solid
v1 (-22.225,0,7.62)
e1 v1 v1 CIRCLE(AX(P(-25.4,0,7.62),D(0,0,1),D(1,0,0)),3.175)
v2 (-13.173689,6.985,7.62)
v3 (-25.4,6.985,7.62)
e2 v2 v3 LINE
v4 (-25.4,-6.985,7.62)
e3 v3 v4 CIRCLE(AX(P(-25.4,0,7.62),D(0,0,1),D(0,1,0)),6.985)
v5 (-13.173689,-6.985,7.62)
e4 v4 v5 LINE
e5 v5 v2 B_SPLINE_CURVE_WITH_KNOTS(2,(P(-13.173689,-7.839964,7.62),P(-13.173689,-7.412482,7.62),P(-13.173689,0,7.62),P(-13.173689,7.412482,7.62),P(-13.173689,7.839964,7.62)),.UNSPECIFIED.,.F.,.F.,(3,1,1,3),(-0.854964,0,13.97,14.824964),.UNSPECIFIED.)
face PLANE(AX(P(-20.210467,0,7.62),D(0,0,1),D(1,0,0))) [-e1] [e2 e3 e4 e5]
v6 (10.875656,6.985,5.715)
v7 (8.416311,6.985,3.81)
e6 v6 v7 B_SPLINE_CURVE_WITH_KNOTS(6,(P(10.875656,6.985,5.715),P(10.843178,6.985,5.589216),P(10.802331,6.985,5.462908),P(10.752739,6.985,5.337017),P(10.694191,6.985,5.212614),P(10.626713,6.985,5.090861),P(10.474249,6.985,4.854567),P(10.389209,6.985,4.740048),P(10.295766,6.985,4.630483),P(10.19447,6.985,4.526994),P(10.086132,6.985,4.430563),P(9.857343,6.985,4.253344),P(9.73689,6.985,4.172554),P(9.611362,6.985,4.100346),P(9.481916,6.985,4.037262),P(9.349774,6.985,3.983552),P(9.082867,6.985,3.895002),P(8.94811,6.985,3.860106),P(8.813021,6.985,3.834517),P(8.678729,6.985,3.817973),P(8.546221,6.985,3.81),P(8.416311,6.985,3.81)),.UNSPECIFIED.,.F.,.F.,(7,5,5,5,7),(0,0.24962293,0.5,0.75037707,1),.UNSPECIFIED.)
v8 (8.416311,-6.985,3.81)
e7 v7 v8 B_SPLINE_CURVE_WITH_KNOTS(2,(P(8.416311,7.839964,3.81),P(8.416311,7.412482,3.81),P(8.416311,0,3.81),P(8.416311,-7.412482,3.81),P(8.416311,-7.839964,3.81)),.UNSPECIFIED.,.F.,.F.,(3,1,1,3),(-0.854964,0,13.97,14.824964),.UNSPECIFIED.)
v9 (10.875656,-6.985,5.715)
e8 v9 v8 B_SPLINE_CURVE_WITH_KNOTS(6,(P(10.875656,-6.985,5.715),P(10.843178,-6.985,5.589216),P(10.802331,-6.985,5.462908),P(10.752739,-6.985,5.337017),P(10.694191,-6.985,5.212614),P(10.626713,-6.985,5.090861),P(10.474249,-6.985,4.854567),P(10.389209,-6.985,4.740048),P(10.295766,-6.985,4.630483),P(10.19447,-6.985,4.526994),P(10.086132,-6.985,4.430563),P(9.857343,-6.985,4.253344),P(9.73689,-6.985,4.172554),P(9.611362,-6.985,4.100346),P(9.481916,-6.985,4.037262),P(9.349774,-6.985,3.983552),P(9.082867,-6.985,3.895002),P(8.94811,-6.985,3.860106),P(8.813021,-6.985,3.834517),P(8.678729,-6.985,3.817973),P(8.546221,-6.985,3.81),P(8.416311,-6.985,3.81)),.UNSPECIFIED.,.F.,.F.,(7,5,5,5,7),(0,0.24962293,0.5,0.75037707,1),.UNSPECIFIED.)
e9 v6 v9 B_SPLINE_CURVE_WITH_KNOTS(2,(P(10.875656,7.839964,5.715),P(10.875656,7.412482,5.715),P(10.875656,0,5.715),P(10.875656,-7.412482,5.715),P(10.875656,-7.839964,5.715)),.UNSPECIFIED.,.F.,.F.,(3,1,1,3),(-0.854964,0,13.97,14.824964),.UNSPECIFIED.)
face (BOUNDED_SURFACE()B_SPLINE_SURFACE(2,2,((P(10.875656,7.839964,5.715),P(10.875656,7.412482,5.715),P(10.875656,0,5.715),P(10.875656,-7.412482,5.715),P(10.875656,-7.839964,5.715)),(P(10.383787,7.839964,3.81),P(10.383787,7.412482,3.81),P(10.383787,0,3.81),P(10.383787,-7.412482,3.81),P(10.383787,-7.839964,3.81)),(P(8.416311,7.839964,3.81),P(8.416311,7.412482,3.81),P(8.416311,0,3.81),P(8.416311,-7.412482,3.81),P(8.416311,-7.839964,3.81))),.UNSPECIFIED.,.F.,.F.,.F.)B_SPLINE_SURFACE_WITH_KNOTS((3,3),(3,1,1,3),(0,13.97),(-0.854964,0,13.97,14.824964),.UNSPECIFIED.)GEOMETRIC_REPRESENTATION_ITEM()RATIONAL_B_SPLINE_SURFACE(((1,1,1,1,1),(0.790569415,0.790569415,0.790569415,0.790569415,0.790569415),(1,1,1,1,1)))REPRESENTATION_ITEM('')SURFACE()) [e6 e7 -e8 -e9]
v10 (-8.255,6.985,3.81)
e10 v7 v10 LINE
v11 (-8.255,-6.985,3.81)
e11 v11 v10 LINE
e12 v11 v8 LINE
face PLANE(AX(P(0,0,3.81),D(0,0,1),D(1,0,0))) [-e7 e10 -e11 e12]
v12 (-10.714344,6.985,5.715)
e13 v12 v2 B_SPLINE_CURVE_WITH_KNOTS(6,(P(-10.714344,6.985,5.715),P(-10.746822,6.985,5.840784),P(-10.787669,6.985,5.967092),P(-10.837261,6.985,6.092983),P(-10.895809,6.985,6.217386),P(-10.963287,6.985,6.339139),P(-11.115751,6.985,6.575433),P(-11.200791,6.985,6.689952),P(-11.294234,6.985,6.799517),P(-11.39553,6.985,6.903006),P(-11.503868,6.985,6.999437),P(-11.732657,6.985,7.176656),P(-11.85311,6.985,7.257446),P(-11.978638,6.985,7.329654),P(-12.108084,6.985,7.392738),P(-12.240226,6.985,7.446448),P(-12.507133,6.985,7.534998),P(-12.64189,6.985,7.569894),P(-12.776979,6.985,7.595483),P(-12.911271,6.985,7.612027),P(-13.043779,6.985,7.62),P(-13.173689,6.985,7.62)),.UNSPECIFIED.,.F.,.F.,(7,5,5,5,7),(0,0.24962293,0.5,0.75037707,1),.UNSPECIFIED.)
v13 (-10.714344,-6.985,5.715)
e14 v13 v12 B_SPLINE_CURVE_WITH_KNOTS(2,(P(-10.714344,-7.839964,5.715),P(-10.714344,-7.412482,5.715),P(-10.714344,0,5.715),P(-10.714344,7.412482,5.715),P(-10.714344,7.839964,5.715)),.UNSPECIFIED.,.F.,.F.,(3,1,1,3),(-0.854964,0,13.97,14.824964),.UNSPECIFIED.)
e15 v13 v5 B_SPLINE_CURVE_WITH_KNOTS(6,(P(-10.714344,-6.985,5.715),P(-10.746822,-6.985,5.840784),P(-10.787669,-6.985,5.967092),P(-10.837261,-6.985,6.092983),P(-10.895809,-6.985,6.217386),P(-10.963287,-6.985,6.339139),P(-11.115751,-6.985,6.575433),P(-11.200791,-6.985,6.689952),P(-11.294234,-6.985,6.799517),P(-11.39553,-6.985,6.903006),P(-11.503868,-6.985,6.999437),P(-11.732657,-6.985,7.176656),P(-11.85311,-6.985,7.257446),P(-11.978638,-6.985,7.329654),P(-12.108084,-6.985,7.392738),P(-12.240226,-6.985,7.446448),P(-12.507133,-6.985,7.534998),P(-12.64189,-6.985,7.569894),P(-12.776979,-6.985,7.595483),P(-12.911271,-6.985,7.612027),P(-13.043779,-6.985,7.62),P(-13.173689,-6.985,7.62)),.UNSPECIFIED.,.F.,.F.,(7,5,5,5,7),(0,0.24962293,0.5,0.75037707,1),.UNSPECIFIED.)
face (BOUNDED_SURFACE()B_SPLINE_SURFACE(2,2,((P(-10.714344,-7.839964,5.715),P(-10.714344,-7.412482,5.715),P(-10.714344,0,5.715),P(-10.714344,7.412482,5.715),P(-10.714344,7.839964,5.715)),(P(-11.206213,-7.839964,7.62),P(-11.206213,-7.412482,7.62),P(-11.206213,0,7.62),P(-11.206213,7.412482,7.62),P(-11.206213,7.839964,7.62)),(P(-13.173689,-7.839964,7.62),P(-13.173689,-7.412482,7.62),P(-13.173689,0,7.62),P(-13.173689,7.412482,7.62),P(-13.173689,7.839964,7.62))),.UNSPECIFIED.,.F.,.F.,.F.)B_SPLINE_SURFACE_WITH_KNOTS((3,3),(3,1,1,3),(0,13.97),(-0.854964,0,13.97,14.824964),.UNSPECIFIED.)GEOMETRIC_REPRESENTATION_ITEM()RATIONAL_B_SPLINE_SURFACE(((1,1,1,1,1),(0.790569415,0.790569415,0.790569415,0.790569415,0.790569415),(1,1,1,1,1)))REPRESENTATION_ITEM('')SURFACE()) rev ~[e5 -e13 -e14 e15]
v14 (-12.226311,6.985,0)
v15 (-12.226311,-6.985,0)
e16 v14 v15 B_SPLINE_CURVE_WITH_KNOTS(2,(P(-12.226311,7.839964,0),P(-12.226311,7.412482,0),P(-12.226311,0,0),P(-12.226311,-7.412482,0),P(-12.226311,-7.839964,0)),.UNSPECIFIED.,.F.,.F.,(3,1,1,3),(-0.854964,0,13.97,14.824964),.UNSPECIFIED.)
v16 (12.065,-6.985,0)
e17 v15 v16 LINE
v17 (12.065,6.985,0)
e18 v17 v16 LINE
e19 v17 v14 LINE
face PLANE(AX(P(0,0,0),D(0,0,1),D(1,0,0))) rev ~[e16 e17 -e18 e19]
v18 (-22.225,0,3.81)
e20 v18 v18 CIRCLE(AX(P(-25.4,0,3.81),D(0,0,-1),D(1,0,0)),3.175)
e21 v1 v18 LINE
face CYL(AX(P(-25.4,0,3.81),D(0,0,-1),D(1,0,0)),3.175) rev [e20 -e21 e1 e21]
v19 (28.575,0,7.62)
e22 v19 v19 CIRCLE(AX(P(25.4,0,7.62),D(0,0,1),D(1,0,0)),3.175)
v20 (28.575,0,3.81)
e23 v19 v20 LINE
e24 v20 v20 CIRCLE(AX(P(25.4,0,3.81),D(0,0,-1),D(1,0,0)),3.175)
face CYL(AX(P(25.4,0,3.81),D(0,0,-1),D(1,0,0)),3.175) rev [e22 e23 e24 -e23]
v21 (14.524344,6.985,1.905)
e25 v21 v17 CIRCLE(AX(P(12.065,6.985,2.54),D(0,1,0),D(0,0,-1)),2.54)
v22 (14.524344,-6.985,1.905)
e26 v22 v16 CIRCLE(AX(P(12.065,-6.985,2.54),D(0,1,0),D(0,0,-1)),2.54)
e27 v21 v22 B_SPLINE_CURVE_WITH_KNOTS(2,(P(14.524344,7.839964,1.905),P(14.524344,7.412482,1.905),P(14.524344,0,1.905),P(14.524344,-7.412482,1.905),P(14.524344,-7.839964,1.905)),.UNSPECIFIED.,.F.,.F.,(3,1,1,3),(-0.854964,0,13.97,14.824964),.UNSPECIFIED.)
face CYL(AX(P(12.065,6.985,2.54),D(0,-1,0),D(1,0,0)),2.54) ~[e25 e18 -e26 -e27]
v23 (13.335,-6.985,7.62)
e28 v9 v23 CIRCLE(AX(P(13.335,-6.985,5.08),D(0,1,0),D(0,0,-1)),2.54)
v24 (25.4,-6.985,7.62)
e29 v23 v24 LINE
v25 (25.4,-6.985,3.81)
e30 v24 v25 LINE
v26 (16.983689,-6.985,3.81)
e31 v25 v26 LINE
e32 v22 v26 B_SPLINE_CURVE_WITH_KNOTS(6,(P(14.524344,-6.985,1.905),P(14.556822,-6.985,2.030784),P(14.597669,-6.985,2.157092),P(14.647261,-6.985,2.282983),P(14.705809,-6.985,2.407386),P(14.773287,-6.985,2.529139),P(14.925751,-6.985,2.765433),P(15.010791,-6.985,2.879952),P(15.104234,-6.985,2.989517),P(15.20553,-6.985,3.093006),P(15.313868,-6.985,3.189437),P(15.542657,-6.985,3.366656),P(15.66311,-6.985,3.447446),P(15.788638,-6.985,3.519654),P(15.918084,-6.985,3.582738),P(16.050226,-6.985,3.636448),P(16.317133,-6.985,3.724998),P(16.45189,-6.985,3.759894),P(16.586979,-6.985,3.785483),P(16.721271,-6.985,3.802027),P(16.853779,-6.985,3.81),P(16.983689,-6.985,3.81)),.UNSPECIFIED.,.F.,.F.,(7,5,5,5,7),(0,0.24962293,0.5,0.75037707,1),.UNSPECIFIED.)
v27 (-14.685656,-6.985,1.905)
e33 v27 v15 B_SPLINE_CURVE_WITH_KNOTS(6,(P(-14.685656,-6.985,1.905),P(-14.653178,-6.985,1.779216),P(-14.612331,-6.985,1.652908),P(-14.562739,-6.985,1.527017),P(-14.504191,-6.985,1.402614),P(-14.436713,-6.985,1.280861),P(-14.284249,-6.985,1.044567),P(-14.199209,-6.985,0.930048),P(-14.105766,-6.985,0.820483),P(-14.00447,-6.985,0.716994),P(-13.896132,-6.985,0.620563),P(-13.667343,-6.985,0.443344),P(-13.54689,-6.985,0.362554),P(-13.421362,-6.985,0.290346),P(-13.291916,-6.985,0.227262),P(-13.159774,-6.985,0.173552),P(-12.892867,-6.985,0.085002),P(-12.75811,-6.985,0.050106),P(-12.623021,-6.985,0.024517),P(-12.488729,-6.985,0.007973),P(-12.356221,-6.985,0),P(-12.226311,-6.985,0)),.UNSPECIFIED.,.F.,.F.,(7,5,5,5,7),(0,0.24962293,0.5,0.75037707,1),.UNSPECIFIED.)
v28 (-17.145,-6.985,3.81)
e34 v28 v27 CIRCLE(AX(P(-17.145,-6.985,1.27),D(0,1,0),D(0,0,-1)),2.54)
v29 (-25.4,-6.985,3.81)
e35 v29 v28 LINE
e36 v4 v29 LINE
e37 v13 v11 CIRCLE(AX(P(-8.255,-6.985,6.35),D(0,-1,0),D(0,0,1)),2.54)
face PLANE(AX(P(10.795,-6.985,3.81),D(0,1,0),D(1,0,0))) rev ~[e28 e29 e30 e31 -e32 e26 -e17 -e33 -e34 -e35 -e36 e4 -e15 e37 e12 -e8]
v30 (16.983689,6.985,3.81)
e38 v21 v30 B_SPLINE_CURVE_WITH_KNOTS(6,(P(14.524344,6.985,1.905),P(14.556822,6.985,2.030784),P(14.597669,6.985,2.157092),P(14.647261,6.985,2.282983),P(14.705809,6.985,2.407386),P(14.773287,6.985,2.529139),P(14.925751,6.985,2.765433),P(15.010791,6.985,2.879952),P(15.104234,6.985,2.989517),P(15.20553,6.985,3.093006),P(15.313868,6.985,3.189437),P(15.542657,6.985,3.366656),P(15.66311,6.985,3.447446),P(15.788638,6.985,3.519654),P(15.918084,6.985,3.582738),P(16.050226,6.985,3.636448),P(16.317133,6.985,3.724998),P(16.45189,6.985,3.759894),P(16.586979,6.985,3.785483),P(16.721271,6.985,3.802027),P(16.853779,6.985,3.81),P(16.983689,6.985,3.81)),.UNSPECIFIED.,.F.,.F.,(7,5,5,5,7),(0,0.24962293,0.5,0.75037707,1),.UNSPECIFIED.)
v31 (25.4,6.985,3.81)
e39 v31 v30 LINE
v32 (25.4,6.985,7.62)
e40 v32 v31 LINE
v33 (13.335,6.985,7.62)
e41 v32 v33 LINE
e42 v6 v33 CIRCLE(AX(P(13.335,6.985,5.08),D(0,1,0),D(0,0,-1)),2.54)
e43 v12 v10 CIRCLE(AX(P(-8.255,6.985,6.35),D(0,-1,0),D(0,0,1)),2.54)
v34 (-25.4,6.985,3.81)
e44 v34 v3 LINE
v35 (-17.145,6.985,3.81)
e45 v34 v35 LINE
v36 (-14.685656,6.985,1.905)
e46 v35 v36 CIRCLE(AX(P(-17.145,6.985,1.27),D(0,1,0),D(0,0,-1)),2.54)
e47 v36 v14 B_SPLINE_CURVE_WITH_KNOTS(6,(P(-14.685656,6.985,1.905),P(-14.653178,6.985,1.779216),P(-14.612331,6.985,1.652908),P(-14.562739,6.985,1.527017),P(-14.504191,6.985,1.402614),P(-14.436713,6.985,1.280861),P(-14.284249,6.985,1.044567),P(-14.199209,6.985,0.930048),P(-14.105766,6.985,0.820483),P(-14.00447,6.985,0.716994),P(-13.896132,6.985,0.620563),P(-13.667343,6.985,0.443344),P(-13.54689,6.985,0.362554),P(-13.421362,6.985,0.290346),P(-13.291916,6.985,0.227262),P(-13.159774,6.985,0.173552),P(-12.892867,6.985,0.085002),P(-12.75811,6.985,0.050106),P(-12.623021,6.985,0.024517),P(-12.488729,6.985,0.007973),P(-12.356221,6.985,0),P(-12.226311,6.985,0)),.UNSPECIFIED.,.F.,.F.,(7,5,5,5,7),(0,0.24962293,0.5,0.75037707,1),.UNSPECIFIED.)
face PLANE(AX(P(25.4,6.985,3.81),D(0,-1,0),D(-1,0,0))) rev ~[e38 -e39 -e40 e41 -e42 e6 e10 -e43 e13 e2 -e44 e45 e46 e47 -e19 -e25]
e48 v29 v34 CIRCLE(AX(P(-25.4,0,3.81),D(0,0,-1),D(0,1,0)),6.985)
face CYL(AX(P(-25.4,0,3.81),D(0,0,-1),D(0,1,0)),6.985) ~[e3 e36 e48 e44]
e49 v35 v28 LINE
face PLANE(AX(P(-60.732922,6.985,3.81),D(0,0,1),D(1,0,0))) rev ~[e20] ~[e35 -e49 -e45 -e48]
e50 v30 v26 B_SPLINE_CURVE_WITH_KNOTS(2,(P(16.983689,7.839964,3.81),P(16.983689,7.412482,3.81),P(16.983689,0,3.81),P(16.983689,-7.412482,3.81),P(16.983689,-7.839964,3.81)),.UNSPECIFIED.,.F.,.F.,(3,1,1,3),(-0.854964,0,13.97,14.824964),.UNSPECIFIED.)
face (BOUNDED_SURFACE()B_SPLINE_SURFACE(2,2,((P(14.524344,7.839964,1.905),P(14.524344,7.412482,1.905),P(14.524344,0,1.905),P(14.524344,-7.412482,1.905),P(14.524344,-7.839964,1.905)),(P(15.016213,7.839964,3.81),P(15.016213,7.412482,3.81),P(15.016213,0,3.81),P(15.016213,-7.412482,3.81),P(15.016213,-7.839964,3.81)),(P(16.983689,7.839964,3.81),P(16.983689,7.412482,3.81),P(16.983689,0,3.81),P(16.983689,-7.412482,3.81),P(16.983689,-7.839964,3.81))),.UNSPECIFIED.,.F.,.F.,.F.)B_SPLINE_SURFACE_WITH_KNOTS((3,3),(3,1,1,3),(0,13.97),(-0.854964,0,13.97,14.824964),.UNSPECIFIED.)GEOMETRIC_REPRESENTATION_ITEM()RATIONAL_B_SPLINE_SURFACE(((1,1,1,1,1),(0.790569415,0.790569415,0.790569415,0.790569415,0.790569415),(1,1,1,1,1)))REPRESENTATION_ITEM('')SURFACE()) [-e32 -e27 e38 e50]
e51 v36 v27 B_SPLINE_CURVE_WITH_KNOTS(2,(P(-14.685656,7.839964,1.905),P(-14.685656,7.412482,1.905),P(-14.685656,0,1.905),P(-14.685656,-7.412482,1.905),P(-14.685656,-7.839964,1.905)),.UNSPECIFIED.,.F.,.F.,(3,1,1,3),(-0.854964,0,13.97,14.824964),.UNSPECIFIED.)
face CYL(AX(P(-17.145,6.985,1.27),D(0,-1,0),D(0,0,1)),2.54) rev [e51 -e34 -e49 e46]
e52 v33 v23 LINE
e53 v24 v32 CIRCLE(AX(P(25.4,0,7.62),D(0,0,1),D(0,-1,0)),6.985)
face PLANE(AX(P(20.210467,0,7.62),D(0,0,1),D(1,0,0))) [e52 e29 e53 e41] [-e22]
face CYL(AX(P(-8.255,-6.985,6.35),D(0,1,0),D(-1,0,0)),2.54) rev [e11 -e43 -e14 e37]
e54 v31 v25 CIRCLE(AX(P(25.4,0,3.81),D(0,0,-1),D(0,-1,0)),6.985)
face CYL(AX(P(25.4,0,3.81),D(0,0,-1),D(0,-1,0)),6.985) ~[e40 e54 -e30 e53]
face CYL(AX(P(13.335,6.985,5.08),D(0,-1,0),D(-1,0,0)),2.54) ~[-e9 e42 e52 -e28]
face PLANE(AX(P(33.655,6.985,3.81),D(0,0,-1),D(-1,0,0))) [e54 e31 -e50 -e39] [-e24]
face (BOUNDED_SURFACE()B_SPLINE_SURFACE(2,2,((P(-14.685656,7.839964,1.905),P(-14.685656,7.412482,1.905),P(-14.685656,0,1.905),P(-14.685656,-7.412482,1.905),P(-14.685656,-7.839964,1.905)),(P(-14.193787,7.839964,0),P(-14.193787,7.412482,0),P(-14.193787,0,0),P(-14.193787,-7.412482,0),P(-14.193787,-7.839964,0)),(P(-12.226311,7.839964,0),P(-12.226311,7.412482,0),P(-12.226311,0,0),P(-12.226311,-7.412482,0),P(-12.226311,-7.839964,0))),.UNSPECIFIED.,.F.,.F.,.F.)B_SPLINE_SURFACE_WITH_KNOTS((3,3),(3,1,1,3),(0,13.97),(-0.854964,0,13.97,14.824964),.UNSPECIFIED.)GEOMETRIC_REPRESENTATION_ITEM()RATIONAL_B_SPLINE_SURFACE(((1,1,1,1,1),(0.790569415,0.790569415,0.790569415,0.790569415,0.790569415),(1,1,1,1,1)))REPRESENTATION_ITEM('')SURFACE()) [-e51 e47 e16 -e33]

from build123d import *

# Parameters (mm, degrees)
F0_R      = 3.175
F1_DEPTH  = 3.81
F2_R      = 3.175
F3_DEPTH  = 3.81
F4_W      = 35.3329224761
F4_H      = 3.81
F4_W_2    = 10.795
F5_DEPTH  = 38.1
F6_R      = 2.54
F7_R      = 2.54
F8_R      = 3.175
F9_DEPTH  = 3.81
F10_W     = 19.05
F10_H     = 3.81
F11_DEPTH = 38.1
F12_R     = 2.54
F13_R     = 2.54


with BuildPart() as f1:
    # F0 (on Top) → F1 (new body)
    with BuildSketch(Plane.XY):
        with BuildLine():
            ThreePointArc((25.4, -6.985), (32.385, 0), (25.4, 6.985))
            Line((25.4, 6.985), (-25.4, 6.985))
            ThreePointArc((-25.4, 6.985), (-32.385, 0), (-25.4, -6.985))
            Line((-25.4, -6.985), (25.4, -6.985))
        make_face()
        with Locations((-25.4, 0)):
            Circle(F0_R, mode=Mode.SUBTRACT)
        with Locations((25.4, 0)):
            Circle(F0_R, mode=Mode.SUBTRACT)
    extrude(amount=F1_DEPTH)

    # F2 (on face) → F3 (join)
    with BuildSketch(Plane.XY.offset(3.81)):
        with BuildLine():
            Line((-10.795, -6.985), (-10.795, 6.985))
            Line((-10.795, 6.985), (-25.4, 6.985))
            ThreePointArc((-25.4, 6.985), (-32.385, 0), (-25.4, -6.985))
            Line((-25.4, -6.985), (-10.795, -6.985))
        make_face()
        with Locations((-25.4, 0)):
            Circle(F2_R, mode=Mode.SUBTRACT)
    extrude(amount=F3_DEPTH)

    # F4 (on face) → F5 (cut)
    with BuildSketch(Plane(origin=(0, 6.985, 0), x_dir=(-1, 0, 0), z_dir=(0, 1, 0))):
        with Locations((43.066461238, 1.905)):
            Rectangle(F4_W, F4_H)
        with Locations((20.0025, 1.905)):
            Rectangle(F4_W_2, F4_H)
    extrude(amount=-F5_DEPTH, mode=Mode.SUBTRACT)

    # F6
    f6_edges = [f1.edges().sort_by_distance(p)[0] for p in [
        (-10.795, 0, 3.81),
        (-14.605, 0, 3.81),
    ]]
    fillet(f6_edges, radius=F6_R)

    # F7
    f7_edges = [f1.edges().sort_by_distance(p)[0] for p in [
        (-10.795, 0, 7.62),
        (-14.605, 0, 0),
    ]]
    fillet(f7_edges, radius=F7_R)

    # F8 (on face) → F9 (join)
    with BuildSketch(Plane.XY.offset(3.81)):
        with BuildLine():
            Line((25.4, 6.985), (10.795, 6.985))
            Line((10.795, 6.985), (10.795, -6.985))
            Line((10.795, -6.985), (25.4, -6.985))
            ThreePointArc((25.4, -6.985), (32.385, 0), (25.4, 6.985))
        make_face()
        with Locations((25.4, 0)):
            Circle(F8_R, mode=Mode.SUBTRACT)
    extrude(amount=F9_DEPTH)

    # F10 (on face) → F11 (cut)
    with BuildSketch(Plane(origin=(0, 6.985, 0), x_dir=(-1, 0, 0), z_dir=(0, 1, 0))):
        with Locations((-24.13, 1.905)):
            Rectangle(F10_W, F10_H)
    extrude(amount=-F11_DEPTH, mode=Mode.SUBTRACT)

    # F12
    f12_edges = [f1.edges().sort_by_distance(p)[0] for p in [
        (14.605, 0, 0),
        (10.795, 0, 7.62),
    ]]
    fillet(f12_edges, radius=F12_R)

    # F13
    f13_edges = [f1.edges().sort_by_distance(p)[0] for p in [
        (10.795, 0, 3.81),
        (14.605, 0, 3.81),
    ]]
    fillet(f13_edges, radius=F13_R)


solid = f1.part
